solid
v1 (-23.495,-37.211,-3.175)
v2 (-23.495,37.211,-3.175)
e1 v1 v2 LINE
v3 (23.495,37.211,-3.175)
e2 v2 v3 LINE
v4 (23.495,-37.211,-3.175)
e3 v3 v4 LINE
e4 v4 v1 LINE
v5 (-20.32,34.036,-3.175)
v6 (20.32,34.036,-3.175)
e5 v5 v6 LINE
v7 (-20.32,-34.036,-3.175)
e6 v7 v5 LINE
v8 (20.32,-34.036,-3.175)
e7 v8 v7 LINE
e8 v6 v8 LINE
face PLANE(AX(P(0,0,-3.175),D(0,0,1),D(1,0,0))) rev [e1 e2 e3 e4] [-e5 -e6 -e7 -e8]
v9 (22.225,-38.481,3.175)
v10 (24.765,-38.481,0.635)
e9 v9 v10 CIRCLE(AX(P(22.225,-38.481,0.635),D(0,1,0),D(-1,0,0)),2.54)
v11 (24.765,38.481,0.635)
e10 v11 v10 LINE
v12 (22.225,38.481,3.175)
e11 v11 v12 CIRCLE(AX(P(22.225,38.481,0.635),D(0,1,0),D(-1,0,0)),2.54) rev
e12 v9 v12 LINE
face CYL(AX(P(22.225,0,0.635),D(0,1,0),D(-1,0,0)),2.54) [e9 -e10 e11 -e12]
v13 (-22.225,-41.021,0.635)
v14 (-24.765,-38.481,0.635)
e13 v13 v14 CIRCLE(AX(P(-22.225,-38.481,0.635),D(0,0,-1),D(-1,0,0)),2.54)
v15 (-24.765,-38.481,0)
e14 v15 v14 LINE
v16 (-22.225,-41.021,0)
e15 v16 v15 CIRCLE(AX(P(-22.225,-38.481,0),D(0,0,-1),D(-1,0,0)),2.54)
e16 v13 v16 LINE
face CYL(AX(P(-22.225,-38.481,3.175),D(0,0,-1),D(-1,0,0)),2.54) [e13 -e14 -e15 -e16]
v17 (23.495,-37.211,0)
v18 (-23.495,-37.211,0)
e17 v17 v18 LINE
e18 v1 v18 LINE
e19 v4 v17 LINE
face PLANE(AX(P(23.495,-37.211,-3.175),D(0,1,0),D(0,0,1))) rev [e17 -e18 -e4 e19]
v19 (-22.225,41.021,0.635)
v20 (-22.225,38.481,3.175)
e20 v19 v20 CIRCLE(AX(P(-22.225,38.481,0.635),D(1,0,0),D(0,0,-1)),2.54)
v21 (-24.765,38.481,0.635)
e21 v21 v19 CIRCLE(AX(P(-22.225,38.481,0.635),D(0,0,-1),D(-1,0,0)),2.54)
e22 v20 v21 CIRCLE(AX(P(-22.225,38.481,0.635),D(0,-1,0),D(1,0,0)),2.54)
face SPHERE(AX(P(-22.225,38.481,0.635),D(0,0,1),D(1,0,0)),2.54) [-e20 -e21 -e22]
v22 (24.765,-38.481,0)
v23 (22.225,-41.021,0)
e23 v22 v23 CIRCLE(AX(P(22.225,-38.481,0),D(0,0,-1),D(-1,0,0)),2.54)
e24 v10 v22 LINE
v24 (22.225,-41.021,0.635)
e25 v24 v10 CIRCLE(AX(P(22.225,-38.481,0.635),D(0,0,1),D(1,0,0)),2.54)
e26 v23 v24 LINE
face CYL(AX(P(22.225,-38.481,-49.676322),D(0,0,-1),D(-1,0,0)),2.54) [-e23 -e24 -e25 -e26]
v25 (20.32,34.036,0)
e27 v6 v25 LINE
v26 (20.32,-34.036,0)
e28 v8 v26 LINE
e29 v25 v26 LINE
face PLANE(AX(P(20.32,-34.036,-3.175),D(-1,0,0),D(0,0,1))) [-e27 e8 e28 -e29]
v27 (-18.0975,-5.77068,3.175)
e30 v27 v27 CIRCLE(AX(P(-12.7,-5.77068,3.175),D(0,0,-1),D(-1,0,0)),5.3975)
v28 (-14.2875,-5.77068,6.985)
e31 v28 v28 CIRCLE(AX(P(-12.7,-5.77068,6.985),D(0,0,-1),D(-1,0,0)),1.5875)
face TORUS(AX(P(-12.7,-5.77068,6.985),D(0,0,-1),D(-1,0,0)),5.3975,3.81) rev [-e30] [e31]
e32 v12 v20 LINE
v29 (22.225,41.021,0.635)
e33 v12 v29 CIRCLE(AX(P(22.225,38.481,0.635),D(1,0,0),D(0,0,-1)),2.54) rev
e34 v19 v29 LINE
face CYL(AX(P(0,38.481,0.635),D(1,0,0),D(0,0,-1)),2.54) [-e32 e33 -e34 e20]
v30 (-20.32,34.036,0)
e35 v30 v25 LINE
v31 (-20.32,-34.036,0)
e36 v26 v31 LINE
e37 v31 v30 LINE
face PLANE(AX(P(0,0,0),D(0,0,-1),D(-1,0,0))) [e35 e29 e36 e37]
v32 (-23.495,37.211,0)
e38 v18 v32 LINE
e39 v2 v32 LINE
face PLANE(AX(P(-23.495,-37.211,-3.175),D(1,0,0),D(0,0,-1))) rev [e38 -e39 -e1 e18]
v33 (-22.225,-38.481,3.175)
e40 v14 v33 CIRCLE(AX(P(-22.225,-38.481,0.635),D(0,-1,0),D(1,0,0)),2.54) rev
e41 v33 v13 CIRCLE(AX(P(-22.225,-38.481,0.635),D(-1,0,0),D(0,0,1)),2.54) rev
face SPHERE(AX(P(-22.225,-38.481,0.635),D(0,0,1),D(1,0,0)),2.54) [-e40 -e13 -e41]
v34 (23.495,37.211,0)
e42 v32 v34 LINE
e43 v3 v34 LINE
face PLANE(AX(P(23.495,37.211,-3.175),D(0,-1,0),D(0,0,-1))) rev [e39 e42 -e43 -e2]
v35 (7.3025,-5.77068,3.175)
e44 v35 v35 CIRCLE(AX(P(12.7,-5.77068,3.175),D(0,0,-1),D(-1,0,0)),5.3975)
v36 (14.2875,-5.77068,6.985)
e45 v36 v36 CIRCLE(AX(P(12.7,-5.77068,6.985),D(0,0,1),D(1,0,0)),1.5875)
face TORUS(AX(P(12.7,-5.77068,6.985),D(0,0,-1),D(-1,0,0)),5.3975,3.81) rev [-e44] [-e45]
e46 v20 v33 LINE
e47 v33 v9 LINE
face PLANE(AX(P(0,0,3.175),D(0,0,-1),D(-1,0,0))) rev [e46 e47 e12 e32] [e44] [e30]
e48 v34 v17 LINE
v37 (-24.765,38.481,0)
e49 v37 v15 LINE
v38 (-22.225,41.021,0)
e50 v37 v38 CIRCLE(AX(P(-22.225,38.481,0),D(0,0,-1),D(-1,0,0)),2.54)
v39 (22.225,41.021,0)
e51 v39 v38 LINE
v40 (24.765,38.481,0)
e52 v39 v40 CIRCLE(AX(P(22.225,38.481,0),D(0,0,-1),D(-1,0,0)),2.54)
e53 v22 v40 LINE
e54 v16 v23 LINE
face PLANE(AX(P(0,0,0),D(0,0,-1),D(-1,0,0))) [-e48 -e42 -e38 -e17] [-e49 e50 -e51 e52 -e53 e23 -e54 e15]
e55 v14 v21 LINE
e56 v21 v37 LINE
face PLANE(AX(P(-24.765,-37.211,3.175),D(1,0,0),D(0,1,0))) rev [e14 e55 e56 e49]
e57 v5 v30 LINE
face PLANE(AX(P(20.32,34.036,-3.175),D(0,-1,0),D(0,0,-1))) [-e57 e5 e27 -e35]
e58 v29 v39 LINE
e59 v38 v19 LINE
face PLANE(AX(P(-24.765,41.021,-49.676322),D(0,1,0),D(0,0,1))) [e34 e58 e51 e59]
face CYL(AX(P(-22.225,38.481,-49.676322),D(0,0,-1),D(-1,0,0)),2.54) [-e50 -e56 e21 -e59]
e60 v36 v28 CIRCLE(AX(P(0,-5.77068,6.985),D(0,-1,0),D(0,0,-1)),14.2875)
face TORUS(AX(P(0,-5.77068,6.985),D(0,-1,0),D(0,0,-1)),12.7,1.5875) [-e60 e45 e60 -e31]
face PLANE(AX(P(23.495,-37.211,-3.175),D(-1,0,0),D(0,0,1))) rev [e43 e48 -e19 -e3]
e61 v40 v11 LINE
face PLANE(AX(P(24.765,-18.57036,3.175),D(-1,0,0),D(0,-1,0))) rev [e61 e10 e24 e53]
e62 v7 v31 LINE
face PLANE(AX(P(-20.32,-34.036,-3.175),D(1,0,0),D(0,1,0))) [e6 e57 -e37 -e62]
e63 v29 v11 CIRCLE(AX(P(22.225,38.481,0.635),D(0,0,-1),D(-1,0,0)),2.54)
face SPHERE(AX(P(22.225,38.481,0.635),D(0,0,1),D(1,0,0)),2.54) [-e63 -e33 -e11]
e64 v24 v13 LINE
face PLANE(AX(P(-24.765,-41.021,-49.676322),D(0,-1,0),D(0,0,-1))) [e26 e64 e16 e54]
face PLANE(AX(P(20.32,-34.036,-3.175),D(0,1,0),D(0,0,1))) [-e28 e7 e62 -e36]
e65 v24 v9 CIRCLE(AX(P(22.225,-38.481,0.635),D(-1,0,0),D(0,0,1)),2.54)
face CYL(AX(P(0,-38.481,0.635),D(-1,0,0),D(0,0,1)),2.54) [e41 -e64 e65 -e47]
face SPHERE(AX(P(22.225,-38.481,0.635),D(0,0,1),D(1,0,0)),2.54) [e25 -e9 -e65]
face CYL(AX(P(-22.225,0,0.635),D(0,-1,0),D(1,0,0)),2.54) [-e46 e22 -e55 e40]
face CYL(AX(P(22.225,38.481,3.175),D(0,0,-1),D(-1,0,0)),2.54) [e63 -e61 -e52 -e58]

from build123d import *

# Parameters (mm, degrees)
BOSS_EXTRUDE1_DEPTH = 3.175
SWEEP1_PROFILE_R    = 1.5875
FILLET1_R           = 3.81
SKETCH14_W          = 49.53
SKETCH14_H          = 3.81
BOSS_EXTRUDE4_DEPTH = 3.175
FILLET2_R           = 2.54
FILLET4_R           = 2.54
SKETCH15_W          = 46.99
SKETCH15_H          = 74.422
SKETCH15_W_2        = 40.64
SKETCH15_H_2        = 68.072
BOSS_EXTRUDE6_DEPTH = 3.175


# Some blends are built 0.0001 mm under size
with BuildPart() as part:
    # Sketch1 → Boss-Extrude1 (new body)
    with BuildSketch(Plane.XY):
        Polygon((-24.765, -37.211), (24.765, -37.211), (24.765, -18.570359608), (24.765, 0.678999912), (24.765, 37.211), (-24.765, 37.211), (-24.765, 0.678999912), (-24.765, -18.570359608), align=None)
    extrude(amount=BOSS_EXTRUDE1_DEPTH)

    # Sweep1: sweep along a path in Sketch7
    with BuildLine(Plane(origin=(0, -5.770679848, 0), x_dir=(1, 0, 0), z_dir=(0, 1, 0))) as sweep1_path:
        Line((-12.7, -3.175), (-12.7, -6.985))
        ThreePointArc((-12.7, -6.985), (0, -19.685), (12.7, -6.985))
        Line((12.7, -6.985), (12.7, -3.175))
    # Sweep1 profile (on start of the path) → Sweep1 (sweep)
    with BuildSketch(Plane(origin=(-12.7, -5.770679848, 3.175), x_dir=(1, 0, 0), z_dir=(0, 0, 1))):
        Circle(SWEEP1_PROFILE_R)
    sweep(path=sweep1_path.line)

    # Fillet1
    fillet1_edges = [part.edges().sort_by_distance(p)[0] for p in [
        (14.2875, -5.770679848, 3.175),
        (-14.2875, -5.770679848, 3.175),
    ]]
    fillet(fillet1_edges, radius=FILLET1_R - 0.0001)  # a hair under: the kernel refuses the full size

    # Sketch14 → Boss-Extrude4 (add)
    with BuildSketch(Plane.XY.offset(3.175)):
        with Locations((0, -39.116)):
            Rectangle(SKETCH14_W, SKETCH14_H)
        with Locations((0, 39.116)):
            Rectangle(SKETCH14_W, SKETCH14_H)
    extrude(amount=-BOSS_EXTRUDE4_DEPTH)

    # Fillet2
    fillet2_edges = [part.edges().sort_by_distance(p)[0] for p in [
        (-24.765, 0, 3.175),
        (0, -41.021, 3.175),
        (24.765, 0, 3.175),
        (0, 41.021, 3.175),
    ]]
    fillet(fillet2_edges, radius=FILLET2_R)

    # Fillet4
    # the kernel refuses this fillet: 2.54 mm, written as the material it takes off along each edge
    with BuildSketch(Plane(origin=(-22.225, -38.481, 0.635), x_dir=(0, -1, 0), z_dir=(-1, 0, 0))) as fillet4_piece_1_section:
        Polygon((0, 0), (FILLET4_R, 0), (FILLET4_R, FILLET4_R), (0, FILLET4_R), align=None)
    fillet4_piece_1 = extrude(amount=FILLET4_R, mode=Mode.PRIVATE)
    fillet4_piece_1 = fillet4_piece_1 - Plane(origin=(-22.225, -38.481, 0.635), x_dir=(0, 0.7071067811865475, -0.7071067811865475), z_dir=(-1, 0, 0)) * Sphere(FILLET4_R, mode=Mode.PRIVATE)
    add(fillet4_piece_1, mode=Mode.SUBTRACT)
    with BuildSketch(Plane(origin=(-22.225, 38.481, 0.635), x_dir=(0, 1, 0), z_dir=(-1, 0, 0))) as fillet4_piece_2_section:
        Polygon((0, 0), (FILLET4_R, 0), (FILLET4_R, -FILLET4_R), (0, -FILLET4_R), align=None)
    fillet4_piece_2 = extrude(amount=FILLET4_R, mode=Mode.PRIVATE)
    fillet4_piece_2 = fillet4_piece_2 - Plane(origin=(-22.225, 38.481, 0.635), x_dir=(0, -0.7071067811865475, -0.7071067811865475), z_dir=(-1, 0, 0)) * Sphere(FILLET4_R, mode=Mode.PRIVATE)
    add(fillet4_piece_2, mode=Mode.SUBTRACT)
    with BuildSketch(Plane(origin=(22.225, -38.481, 0.635), x_dir=(1, 0, 0), z_dir=(0, -1, 0))) as fillet4_piece_3_section:
        Polygon((0, 0), (FILLET4_R, 0), (FILLET4_R, FILLET4_R), (0, FILLET4_R), align=None)
    fillet4_piece_3 = extrude(amount=FILLET4_R, mode=Mode.PRIVATE)
    fillet4_piece_3 = fillet4_piece_3 - Plane(origin=(22.225, -38.481, 0.635), x_dir=(-0.7071067811865475, 1.0781380386361295e-15, -0.7071067811865475), z_dir=(0, -1, 0)) * Sphere(FILLET4_R, mode=Mode.PRIVATE)
    add(fillet4_piece_3, mode=Mode.SUBTRACT)
    with BuildSketch(Plane(origin=(22.225, 38.481, 0.635), x_dir=(1, 0, 0), z_dir=(0, 1, 0))) as fillet4_piece_4_section:
        Polygon((0, 0), (FILLET4_R, 0), (FILLET4_R, -FILLET4_R), (0, -FILLET4_R), align=None)
    fillet4_piece_4 = extrude(amount=FILLET4_R, mode=Mode.PRIVATE)
    fillet4_piece_4 = fillet4_piece_4 - Plane(origin=(22.225, 38.481, 0.635), x_dir=(-0.7071067811865475, 1.0781380386361295e-15, -0.7071067811865475), z_dir=(0, 1, 0)) * Sphere(FILLET4_R, mode=Mode.PRIVATE)
    add(fillet4_piece_4, mode=Mode.SUBTRACT)
    with BuildSketch(Plane(origin=(24.765, -41.021, 0.635), x_dir=(-1, 0, 0), z_dir=(0, 0, -1)), Plane(origin=(-24.765, -41.021, 0.635), x_dir=(0, 1, 0), z_dir=(0, 0, -1))) as fillet4_piece_5:
        with BuildLine():
            CenterArc((FILLET4_R, FILLET4_R), FILLET4_R, 180, 90)
            Line((0, FILLET4_R), (0, 0))
            Line((0, 0), (FILLET4_R, 0))
        make_face()
    extrude(amount=6.985, mode=Mode.SUBTRACT)
    with BuildSketch(Plane(origin=(24.765, 41.021, 0.635), x_dir=(-1, 0, 0), z_dir=(0, 0, -1)), Plane(origin=(-24.765, 41.021, 0.635), x_dir=(0, -1, 0), z_dir=(0, 0, -1))) as fillet4_piece_6:
        with BuildLine():
            CenterArc((FILLET4_R, -FILLET4_R), FILLET4_R, 90, 90)
            Line((0, -FILLET4_R), (0, 0))
            Line((0, 0), (FILLET4_R, 0))
        make_face()
    extrude(amount=6.985, mode=Mode.SUBTRACT)

    # Sketch15 → Boss-Extrude6 (add)
    with BuildSketch(Plane(origin=(0, 0, 0), x_dir=(-1, 0, 0), z_dir=(0, 0, -1))):
        Rectangle(SKETCH15_W, SKETCH15_H)
        Rectangle(SKETCH15_W_2, SKETCH15_H_2, mode=Mode.SUBTRACT)
    extrude(amount=BOSS_EXTRUDE6_DEPTH)


solid = part.part
